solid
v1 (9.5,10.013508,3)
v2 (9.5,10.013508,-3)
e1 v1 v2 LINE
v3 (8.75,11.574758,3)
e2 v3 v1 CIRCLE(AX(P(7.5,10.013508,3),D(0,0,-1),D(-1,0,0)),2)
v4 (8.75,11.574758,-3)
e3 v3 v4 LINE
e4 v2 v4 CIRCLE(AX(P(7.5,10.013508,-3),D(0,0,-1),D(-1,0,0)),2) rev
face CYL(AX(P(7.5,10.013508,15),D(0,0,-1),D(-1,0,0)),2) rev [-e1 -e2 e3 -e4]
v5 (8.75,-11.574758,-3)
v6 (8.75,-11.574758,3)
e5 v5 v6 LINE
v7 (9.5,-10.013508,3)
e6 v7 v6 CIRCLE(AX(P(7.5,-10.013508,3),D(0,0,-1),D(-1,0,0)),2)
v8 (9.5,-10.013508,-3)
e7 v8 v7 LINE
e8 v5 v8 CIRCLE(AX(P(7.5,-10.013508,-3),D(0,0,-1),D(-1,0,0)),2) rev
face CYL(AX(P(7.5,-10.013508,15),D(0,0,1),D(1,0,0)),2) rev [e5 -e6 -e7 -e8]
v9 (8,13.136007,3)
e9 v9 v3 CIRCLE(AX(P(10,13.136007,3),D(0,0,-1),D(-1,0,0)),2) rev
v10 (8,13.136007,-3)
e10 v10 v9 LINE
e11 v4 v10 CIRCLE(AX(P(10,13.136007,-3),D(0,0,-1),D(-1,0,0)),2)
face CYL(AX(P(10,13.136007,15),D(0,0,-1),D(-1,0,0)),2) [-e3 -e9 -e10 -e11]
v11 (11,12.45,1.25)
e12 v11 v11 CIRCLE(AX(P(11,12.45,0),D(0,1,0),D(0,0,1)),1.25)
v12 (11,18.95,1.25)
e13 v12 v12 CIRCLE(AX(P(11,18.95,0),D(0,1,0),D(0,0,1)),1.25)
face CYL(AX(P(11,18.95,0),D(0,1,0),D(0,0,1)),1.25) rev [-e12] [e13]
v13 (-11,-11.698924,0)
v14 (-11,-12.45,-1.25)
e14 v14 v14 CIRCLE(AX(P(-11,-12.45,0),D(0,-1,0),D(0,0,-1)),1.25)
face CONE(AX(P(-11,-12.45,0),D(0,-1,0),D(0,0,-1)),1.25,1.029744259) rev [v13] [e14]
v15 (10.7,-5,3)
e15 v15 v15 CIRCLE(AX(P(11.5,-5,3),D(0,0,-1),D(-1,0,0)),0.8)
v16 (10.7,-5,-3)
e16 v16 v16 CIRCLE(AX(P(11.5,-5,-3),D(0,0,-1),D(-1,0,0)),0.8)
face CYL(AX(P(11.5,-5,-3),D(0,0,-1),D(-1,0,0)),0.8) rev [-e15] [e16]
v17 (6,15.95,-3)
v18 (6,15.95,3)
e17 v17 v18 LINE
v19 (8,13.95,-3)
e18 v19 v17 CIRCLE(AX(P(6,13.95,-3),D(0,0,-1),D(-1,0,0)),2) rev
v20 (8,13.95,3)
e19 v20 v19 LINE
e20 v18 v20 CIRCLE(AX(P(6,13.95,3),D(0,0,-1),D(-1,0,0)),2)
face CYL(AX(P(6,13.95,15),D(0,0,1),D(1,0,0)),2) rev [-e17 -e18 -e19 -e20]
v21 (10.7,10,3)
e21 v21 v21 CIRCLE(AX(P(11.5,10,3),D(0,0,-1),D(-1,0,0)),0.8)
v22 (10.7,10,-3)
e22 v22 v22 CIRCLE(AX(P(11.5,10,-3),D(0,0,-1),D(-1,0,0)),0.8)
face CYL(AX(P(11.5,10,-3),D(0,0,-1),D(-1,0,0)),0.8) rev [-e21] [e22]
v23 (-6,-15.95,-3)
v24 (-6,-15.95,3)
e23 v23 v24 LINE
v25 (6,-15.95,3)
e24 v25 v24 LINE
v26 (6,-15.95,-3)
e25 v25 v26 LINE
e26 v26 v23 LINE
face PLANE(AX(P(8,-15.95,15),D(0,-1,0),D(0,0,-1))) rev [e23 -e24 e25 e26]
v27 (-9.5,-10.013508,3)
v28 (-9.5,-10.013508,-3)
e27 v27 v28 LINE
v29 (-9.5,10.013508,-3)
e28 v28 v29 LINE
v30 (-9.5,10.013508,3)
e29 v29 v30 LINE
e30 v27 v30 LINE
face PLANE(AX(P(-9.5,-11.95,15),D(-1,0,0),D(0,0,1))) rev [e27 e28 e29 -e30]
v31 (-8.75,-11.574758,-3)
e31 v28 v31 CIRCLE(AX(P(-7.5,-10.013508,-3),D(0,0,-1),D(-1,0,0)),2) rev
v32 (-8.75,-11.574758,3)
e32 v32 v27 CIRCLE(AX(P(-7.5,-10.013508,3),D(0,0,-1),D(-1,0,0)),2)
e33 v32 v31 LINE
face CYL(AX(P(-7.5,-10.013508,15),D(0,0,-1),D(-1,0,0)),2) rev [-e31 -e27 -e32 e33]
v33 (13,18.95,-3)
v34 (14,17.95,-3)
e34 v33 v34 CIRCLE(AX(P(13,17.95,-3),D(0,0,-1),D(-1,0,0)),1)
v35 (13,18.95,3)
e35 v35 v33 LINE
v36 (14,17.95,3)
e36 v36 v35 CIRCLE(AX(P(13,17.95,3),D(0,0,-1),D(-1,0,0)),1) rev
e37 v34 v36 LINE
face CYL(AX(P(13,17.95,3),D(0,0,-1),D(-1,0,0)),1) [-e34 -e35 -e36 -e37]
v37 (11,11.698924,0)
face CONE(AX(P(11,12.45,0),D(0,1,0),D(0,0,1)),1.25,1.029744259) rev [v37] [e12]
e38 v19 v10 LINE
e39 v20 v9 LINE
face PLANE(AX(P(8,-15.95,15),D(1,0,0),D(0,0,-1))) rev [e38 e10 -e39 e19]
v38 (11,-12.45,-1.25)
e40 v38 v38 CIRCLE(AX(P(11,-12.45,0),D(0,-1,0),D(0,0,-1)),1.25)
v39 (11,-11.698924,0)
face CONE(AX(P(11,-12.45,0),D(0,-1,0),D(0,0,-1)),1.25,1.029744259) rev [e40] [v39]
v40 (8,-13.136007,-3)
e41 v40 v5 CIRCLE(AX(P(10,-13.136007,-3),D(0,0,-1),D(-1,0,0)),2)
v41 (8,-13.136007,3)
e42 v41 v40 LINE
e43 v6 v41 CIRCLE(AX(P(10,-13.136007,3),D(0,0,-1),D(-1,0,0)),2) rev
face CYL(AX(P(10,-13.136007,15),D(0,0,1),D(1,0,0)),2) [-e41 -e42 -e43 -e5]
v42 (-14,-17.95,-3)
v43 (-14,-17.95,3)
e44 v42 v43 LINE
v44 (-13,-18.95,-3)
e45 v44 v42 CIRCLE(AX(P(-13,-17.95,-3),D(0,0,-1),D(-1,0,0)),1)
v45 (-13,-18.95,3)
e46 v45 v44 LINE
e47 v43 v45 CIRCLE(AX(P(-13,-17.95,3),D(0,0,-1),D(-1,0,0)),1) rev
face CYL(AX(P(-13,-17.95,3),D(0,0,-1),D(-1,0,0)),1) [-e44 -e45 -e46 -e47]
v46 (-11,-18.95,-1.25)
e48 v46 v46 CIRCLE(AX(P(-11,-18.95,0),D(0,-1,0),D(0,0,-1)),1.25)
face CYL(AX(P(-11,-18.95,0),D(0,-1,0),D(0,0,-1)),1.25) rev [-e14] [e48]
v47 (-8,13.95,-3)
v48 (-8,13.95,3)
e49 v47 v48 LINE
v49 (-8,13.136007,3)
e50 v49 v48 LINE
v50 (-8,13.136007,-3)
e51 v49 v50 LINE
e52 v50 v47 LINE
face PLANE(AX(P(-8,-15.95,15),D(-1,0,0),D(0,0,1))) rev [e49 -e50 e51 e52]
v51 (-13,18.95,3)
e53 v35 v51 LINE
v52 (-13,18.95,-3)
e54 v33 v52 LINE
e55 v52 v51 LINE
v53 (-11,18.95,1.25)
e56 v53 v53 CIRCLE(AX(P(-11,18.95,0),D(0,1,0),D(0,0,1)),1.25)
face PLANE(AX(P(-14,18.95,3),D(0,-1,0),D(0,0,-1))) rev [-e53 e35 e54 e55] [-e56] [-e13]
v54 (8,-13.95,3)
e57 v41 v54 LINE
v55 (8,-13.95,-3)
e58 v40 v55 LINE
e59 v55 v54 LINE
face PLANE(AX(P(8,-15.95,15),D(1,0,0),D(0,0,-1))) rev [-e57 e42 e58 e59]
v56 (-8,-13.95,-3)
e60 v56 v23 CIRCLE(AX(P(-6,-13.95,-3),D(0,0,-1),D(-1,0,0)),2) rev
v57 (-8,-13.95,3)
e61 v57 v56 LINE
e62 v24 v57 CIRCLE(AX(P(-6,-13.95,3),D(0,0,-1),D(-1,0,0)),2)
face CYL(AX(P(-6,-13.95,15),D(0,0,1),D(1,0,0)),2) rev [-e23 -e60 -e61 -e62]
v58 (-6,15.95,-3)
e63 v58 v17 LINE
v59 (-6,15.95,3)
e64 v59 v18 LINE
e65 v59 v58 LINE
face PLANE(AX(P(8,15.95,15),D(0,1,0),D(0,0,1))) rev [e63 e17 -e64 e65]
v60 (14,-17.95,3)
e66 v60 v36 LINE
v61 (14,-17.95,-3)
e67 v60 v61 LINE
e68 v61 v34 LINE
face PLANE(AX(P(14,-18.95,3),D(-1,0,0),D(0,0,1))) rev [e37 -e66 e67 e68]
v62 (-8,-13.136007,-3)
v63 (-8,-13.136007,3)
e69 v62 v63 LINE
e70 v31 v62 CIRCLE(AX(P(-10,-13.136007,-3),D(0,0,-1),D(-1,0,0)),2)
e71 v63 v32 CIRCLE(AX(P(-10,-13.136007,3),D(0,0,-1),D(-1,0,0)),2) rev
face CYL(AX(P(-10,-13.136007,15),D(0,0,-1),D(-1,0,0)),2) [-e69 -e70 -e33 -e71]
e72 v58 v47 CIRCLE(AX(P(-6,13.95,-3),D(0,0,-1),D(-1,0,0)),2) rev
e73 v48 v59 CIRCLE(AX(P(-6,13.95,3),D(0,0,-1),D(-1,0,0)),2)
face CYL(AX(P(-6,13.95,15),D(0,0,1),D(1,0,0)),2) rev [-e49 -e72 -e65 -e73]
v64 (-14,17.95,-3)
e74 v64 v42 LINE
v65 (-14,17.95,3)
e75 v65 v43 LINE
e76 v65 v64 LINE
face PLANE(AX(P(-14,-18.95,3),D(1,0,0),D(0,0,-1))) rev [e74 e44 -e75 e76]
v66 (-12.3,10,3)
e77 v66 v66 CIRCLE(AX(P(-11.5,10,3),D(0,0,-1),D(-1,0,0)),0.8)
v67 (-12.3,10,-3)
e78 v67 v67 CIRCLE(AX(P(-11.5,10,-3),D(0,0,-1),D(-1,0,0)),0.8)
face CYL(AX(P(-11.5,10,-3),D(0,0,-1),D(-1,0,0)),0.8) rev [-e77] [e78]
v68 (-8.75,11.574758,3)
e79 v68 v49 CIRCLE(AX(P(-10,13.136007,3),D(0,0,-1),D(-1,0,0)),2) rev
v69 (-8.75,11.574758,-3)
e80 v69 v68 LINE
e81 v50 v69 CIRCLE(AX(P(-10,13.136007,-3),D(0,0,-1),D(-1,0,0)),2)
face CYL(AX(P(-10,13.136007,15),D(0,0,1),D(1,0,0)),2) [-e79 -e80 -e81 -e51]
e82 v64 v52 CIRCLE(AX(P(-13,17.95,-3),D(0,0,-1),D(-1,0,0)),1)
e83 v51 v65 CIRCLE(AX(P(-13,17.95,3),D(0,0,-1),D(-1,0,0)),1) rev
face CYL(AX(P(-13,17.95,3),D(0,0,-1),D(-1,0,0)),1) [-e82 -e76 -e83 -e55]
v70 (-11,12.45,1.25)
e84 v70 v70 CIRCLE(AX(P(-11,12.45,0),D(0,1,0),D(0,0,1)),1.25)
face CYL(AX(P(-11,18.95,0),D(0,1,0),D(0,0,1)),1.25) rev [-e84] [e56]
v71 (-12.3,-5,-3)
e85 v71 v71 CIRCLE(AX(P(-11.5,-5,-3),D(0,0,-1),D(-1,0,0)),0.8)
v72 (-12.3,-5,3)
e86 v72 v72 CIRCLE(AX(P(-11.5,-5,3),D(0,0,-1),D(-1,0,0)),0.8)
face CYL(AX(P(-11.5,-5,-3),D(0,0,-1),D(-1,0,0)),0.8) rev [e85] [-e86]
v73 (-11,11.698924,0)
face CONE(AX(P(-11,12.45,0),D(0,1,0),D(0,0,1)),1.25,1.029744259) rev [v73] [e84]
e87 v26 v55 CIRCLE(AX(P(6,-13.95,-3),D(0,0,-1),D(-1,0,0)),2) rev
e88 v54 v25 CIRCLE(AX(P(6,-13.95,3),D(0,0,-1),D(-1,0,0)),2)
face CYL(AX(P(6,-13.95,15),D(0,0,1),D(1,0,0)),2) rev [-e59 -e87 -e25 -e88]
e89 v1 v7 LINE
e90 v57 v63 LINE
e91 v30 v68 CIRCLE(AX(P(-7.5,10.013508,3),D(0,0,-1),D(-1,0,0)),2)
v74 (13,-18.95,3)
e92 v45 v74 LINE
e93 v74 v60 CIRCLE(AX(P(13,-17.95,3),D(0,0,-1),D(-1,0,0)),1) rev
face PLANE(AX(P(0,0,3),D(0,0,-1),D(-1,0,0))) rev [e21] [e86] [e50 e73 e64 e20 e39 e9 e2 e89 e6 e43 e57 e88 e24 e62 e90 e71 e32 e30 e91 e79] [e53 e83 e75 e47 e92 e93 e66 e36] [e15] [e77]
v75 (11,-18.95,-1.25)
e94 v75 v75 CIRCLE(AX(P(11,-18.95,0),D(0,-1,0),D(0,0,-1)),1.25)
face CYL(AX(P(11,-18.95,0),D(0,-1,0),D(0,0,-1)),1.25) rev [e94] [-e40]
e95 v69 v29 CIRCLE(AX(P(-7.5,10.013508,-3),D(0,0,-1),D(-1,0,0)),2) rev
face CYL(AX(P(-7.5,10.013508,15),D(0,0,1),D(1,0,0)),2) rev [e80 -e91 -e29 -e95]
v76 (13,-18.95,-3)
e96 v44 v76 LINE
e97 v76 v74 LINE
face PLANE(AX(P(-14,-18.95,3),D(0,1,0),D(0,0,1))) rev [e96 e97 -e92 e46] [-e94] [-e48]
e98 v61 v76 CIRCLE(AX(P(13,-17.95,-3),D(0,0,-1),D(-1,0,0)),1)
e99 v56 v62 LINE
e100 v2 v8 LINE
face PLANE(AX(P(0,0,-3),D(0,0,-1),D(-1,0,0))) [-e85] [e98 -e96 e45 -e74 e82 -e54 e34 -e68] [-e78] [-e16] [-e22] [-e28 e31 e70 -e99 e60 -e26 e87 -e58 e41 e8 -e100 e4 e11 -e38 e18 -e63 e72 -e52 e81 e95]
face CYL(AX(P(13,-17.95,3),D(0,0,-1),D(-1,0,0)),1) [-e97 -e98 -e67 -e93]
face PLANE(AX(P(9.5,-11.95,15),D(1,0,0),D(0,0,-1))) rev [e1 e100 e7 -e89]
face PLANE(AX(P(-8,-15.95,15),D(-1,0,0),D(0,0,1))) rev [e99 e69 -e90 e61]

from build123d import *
from OCP.BRepFilletAPI import BRepFilletAPI_MakeFillet

# Parameters (mm, degrees)
SKETCH_1_W                  = 28
SKETCH_1_H                  = 37.9
EXTRUDE_1_DEPTH             = 3
HOLE_WIZARD_M3_1_AT_2_COUNT = 2
HOLE_WIZARD_M3_1_AT_2_PITCH = 22
HOLE_WIZARD_M2_1_D          = 1.6
SKETCH_8_W                  = 16
SKETCH_8_H                  = 31.9
CUT_EXTRUDE_1_DEPTH         = 18
SKETCH_9_W                  = 19
SKETCH_9_H                  = 23.9
CUT_EXTRUDE_2_DEPTH         = 18
FILLET_1_R                  = 2
FILLET_2_R1                 = 2
FILLET_2_R2                 = 1


with BuildPart() as part:
    # 草图1 → 凸台-拉伸1 (new, symmetric)
    with BuildSketch(Plane.XY):
        Rectangle(SKETCH_1_W, SKETCH_1_H)
    extrude(amount=EXTRUDE_1_DEPTH, both=True)

    # 草图4 → M3 螺纹孔1 (revolve, cut)
    with BuildSketch(Plane(origin=(-11, 18.95, 0), x_dir=(0, 0, 1), z_dir=(1, 0, 0))):
        Polygon((0, 0), (0, 7.251075774), (1.25, 6.5), (1.25, 0), align=None)
    hole_wizard_m3_1 = revolve(axis=Axis((-11, 25.3, 0), (0, -1, 0)), mode=Mode.SUBTRACT)

    # M3 螺纹孔1 at 2: M3 螺纹孔1 ×2
    with Locations(*[(i * HOLE_WIZARD_M3_1_AT_2_PITCH, 0, 0) for i in range(1, HOLE_WIZARD_M3_1_AT_2_COUNT)]):
        add(hole_wizard_m3_1, mode=Mode.SUBTRACT)

    # 镜向1: M3 螺纹孔1 across plane
    add(hole_wizard_m3_1.mirror(Plane.ZX), mode=Mode.SUBTRACT)

    # 镜向1 copy 1 sketch → 镜向1 copy 1 (revolve, cut)
    with BuildSketch(Plane(origin=(11, -18.95, 0), x_dir=(0, 0, 1), z_dir=(1, 0, 0))):
        Polygon((0, 0), (0, -7.251075774), (1.25, -6.5), (1.25, 0), align=None)
    revolve(axis=Axis((11, -25.3, 0), (0, -1, 0)), mode=Mode.SUBTRACT)

    # M2 螺纹孔1 (through all)
    with Locations(Plane(origin=(0, 0, -3), x_dir=(-1, 0, 0), z_dir=(0, 0, -1))):
        with Locations((-11.5, 10), (11.5, 10), (11.5, -5), (-11.5, -5)):
            Hole(HOLE_WIZARD_M2_1_D / 2)

    # 草图8 → 切除-拉伸1 (cut, symmetric)
    with BuildSketch(Plane(origin=(0, 0, -3), x_dir=(-1, 0, 0), z_dir=(0, 0, -1))):
        Rectangle(SKETCH_8_W, SKETCH_8_H)
    extrude(amount=CUT_EXTRUDE_1_DEPTH, both=True, mode=Mode.SUBTRACT)

    # 草图9 → 切除-拉伸2 (cut, symmetric)
    with BuildSketch(Plane(origin=(0, 0, -3), x_dir=(-1, 0, 0), z_dir=(0, 0, -1))):
        Rectangle(SKETCH_9_W, SKETCH_9_H)
    extrude(amount=CUT_EXTRUDE_2_DEPTH, both=True, mode=Mode.SUBTRACT)

    # 圆角1
    # the kernel refuses this fillet: 2 mm, written as the material it adds along each edge
    with BuildSketch(Plane(origin=(-9.5, 11.95, 3), x_dir=(1, 0, 0), z_dir=(0, 0, -1))) as fillet_1_piece_1:
        with BuildLine():
            CenterArc((2, 1.936491673), FILLET_1_R, 180, 75.522487814)
            Line((0, 1.936491673), (-0.04, 1.936491673))
            Line((-0.04, 1.936491673), (-0.04, 0))
            Line((-0.04, 0), (0, -0.04))
            ThreePointArc((0, -0.04), (0.75, -0.04), (1.49, -0.038729833))
            Line((1.49, -0.038729833), (1.5, 0))
        make_face()
    extrude(amount=6)
    with BuildSketch(Plane(origin=(-9.5, -11.95, 3), x_dir=(0, 1, 0), z_dir=(0, 0, -1))) as fillet_1_piece_2:
        with BuildLine():
            CenterArc((1.936491673, 2), FILLET_1_R, 194.477512186, 75.522487814)
            Line((0, 1.5), (-0.038729833, 1.49))
            ThreePointArc((-0.038729833, 1.49), (-0.04, 0.75), (-0.04, 0))
            Line((-0.04, 0), (0, -0.04))
            Line((0, -0.04), (1.936491673, -0.04))
            Line((1.936491673, -0.04), (1.936491673, 0))
        make_face()
    extrude(amount=6)
    with BuildSketch(Plane(origin=(9.5, -11.95, -3), x_dir=(-1, 0, 0), z_dir=(0, 0, 1))) as fillet_1_piece_3:
        with BuildLine():
            CenterArc((2, -1.936491673), FILLET_1_R, 104.477512186, 75.522487814)
            Line((0, -1.936491673), (-0.04, -1.936491673))
            Line((-0.04, -1.936491673), (-0.04, 0))
            Line((-0.04, 0), (0, 0.04))
            ThreePointArc((0, 0.04), (0.75, 0.04), (1.49, 0.038729833))
            Line((1.49, 0.038729833), (1.5, 0))
        make_face()
    extrude(amount=6)
    with BuildSketch(Plane(origin=(9.5, 11.95, -3), x_dir=(0, -1, 0), z_dir=(0, 0, 1))) as fillet_1_piece_4:
        with BuildLine():
            CenterArc((1.936491673, -2), FILLET_1_R, 90, 75.522487814)
            Line((0, -1.5), (-0.038729833, -1.49))
            ThreePointArc((-0.038729833, -1.49), (-0.04, -0.75), (-0.04, 0))
            Line((-0.04, 0), (0, 0.04))
            Line((0, 0.04), (1.936491673, 0.04))
            Line((1.936491673, 0.04), (1.936491673, 0))
        make_face()
    extrude(amount=6)

    # 圆角2: one fillet with a radius per group of edges: ONE call of the kernel's fillet builder (fillet() takes one radius for all edges)
    fillet_2_edges_1 = [part.edges().sort_by_distance(p)[0] for p in [
        (8, 11.95, 0),
        (8, 15.95, 0),
        (-8, -11.95, 0),
        (-8, 11.95, 0),
        (-8, 15.95, 0),
        (8, -11.95, 0),
        (8, -15.95, 0),
        (-8, -15.95, 0),
    ]]
    fillet_2_edges_2 = [part.edges().sort_by_distance(p)[0] for p in [
        (14, 18.95, 0),
        (-14, 18.95, 0),
        (-14, -18.95, 0),
        (14, -18.95, 0),
    ]]
    fillet_2 = BRepFilletAPI_MakeFillet(part.part.solid().wrapped)
    for e in fillet_2_edges_1:
        fillet_2.Add(FILLET_2_R1, e.wrapped)
    for e in fillet_2_edges_2:
        fillet_2.Add(FILLET_2_R2, e.wrapped)
    add(Compound.cast(fillet_2.Shape()), mode=Mode.REPLACE)


solid = part.part
